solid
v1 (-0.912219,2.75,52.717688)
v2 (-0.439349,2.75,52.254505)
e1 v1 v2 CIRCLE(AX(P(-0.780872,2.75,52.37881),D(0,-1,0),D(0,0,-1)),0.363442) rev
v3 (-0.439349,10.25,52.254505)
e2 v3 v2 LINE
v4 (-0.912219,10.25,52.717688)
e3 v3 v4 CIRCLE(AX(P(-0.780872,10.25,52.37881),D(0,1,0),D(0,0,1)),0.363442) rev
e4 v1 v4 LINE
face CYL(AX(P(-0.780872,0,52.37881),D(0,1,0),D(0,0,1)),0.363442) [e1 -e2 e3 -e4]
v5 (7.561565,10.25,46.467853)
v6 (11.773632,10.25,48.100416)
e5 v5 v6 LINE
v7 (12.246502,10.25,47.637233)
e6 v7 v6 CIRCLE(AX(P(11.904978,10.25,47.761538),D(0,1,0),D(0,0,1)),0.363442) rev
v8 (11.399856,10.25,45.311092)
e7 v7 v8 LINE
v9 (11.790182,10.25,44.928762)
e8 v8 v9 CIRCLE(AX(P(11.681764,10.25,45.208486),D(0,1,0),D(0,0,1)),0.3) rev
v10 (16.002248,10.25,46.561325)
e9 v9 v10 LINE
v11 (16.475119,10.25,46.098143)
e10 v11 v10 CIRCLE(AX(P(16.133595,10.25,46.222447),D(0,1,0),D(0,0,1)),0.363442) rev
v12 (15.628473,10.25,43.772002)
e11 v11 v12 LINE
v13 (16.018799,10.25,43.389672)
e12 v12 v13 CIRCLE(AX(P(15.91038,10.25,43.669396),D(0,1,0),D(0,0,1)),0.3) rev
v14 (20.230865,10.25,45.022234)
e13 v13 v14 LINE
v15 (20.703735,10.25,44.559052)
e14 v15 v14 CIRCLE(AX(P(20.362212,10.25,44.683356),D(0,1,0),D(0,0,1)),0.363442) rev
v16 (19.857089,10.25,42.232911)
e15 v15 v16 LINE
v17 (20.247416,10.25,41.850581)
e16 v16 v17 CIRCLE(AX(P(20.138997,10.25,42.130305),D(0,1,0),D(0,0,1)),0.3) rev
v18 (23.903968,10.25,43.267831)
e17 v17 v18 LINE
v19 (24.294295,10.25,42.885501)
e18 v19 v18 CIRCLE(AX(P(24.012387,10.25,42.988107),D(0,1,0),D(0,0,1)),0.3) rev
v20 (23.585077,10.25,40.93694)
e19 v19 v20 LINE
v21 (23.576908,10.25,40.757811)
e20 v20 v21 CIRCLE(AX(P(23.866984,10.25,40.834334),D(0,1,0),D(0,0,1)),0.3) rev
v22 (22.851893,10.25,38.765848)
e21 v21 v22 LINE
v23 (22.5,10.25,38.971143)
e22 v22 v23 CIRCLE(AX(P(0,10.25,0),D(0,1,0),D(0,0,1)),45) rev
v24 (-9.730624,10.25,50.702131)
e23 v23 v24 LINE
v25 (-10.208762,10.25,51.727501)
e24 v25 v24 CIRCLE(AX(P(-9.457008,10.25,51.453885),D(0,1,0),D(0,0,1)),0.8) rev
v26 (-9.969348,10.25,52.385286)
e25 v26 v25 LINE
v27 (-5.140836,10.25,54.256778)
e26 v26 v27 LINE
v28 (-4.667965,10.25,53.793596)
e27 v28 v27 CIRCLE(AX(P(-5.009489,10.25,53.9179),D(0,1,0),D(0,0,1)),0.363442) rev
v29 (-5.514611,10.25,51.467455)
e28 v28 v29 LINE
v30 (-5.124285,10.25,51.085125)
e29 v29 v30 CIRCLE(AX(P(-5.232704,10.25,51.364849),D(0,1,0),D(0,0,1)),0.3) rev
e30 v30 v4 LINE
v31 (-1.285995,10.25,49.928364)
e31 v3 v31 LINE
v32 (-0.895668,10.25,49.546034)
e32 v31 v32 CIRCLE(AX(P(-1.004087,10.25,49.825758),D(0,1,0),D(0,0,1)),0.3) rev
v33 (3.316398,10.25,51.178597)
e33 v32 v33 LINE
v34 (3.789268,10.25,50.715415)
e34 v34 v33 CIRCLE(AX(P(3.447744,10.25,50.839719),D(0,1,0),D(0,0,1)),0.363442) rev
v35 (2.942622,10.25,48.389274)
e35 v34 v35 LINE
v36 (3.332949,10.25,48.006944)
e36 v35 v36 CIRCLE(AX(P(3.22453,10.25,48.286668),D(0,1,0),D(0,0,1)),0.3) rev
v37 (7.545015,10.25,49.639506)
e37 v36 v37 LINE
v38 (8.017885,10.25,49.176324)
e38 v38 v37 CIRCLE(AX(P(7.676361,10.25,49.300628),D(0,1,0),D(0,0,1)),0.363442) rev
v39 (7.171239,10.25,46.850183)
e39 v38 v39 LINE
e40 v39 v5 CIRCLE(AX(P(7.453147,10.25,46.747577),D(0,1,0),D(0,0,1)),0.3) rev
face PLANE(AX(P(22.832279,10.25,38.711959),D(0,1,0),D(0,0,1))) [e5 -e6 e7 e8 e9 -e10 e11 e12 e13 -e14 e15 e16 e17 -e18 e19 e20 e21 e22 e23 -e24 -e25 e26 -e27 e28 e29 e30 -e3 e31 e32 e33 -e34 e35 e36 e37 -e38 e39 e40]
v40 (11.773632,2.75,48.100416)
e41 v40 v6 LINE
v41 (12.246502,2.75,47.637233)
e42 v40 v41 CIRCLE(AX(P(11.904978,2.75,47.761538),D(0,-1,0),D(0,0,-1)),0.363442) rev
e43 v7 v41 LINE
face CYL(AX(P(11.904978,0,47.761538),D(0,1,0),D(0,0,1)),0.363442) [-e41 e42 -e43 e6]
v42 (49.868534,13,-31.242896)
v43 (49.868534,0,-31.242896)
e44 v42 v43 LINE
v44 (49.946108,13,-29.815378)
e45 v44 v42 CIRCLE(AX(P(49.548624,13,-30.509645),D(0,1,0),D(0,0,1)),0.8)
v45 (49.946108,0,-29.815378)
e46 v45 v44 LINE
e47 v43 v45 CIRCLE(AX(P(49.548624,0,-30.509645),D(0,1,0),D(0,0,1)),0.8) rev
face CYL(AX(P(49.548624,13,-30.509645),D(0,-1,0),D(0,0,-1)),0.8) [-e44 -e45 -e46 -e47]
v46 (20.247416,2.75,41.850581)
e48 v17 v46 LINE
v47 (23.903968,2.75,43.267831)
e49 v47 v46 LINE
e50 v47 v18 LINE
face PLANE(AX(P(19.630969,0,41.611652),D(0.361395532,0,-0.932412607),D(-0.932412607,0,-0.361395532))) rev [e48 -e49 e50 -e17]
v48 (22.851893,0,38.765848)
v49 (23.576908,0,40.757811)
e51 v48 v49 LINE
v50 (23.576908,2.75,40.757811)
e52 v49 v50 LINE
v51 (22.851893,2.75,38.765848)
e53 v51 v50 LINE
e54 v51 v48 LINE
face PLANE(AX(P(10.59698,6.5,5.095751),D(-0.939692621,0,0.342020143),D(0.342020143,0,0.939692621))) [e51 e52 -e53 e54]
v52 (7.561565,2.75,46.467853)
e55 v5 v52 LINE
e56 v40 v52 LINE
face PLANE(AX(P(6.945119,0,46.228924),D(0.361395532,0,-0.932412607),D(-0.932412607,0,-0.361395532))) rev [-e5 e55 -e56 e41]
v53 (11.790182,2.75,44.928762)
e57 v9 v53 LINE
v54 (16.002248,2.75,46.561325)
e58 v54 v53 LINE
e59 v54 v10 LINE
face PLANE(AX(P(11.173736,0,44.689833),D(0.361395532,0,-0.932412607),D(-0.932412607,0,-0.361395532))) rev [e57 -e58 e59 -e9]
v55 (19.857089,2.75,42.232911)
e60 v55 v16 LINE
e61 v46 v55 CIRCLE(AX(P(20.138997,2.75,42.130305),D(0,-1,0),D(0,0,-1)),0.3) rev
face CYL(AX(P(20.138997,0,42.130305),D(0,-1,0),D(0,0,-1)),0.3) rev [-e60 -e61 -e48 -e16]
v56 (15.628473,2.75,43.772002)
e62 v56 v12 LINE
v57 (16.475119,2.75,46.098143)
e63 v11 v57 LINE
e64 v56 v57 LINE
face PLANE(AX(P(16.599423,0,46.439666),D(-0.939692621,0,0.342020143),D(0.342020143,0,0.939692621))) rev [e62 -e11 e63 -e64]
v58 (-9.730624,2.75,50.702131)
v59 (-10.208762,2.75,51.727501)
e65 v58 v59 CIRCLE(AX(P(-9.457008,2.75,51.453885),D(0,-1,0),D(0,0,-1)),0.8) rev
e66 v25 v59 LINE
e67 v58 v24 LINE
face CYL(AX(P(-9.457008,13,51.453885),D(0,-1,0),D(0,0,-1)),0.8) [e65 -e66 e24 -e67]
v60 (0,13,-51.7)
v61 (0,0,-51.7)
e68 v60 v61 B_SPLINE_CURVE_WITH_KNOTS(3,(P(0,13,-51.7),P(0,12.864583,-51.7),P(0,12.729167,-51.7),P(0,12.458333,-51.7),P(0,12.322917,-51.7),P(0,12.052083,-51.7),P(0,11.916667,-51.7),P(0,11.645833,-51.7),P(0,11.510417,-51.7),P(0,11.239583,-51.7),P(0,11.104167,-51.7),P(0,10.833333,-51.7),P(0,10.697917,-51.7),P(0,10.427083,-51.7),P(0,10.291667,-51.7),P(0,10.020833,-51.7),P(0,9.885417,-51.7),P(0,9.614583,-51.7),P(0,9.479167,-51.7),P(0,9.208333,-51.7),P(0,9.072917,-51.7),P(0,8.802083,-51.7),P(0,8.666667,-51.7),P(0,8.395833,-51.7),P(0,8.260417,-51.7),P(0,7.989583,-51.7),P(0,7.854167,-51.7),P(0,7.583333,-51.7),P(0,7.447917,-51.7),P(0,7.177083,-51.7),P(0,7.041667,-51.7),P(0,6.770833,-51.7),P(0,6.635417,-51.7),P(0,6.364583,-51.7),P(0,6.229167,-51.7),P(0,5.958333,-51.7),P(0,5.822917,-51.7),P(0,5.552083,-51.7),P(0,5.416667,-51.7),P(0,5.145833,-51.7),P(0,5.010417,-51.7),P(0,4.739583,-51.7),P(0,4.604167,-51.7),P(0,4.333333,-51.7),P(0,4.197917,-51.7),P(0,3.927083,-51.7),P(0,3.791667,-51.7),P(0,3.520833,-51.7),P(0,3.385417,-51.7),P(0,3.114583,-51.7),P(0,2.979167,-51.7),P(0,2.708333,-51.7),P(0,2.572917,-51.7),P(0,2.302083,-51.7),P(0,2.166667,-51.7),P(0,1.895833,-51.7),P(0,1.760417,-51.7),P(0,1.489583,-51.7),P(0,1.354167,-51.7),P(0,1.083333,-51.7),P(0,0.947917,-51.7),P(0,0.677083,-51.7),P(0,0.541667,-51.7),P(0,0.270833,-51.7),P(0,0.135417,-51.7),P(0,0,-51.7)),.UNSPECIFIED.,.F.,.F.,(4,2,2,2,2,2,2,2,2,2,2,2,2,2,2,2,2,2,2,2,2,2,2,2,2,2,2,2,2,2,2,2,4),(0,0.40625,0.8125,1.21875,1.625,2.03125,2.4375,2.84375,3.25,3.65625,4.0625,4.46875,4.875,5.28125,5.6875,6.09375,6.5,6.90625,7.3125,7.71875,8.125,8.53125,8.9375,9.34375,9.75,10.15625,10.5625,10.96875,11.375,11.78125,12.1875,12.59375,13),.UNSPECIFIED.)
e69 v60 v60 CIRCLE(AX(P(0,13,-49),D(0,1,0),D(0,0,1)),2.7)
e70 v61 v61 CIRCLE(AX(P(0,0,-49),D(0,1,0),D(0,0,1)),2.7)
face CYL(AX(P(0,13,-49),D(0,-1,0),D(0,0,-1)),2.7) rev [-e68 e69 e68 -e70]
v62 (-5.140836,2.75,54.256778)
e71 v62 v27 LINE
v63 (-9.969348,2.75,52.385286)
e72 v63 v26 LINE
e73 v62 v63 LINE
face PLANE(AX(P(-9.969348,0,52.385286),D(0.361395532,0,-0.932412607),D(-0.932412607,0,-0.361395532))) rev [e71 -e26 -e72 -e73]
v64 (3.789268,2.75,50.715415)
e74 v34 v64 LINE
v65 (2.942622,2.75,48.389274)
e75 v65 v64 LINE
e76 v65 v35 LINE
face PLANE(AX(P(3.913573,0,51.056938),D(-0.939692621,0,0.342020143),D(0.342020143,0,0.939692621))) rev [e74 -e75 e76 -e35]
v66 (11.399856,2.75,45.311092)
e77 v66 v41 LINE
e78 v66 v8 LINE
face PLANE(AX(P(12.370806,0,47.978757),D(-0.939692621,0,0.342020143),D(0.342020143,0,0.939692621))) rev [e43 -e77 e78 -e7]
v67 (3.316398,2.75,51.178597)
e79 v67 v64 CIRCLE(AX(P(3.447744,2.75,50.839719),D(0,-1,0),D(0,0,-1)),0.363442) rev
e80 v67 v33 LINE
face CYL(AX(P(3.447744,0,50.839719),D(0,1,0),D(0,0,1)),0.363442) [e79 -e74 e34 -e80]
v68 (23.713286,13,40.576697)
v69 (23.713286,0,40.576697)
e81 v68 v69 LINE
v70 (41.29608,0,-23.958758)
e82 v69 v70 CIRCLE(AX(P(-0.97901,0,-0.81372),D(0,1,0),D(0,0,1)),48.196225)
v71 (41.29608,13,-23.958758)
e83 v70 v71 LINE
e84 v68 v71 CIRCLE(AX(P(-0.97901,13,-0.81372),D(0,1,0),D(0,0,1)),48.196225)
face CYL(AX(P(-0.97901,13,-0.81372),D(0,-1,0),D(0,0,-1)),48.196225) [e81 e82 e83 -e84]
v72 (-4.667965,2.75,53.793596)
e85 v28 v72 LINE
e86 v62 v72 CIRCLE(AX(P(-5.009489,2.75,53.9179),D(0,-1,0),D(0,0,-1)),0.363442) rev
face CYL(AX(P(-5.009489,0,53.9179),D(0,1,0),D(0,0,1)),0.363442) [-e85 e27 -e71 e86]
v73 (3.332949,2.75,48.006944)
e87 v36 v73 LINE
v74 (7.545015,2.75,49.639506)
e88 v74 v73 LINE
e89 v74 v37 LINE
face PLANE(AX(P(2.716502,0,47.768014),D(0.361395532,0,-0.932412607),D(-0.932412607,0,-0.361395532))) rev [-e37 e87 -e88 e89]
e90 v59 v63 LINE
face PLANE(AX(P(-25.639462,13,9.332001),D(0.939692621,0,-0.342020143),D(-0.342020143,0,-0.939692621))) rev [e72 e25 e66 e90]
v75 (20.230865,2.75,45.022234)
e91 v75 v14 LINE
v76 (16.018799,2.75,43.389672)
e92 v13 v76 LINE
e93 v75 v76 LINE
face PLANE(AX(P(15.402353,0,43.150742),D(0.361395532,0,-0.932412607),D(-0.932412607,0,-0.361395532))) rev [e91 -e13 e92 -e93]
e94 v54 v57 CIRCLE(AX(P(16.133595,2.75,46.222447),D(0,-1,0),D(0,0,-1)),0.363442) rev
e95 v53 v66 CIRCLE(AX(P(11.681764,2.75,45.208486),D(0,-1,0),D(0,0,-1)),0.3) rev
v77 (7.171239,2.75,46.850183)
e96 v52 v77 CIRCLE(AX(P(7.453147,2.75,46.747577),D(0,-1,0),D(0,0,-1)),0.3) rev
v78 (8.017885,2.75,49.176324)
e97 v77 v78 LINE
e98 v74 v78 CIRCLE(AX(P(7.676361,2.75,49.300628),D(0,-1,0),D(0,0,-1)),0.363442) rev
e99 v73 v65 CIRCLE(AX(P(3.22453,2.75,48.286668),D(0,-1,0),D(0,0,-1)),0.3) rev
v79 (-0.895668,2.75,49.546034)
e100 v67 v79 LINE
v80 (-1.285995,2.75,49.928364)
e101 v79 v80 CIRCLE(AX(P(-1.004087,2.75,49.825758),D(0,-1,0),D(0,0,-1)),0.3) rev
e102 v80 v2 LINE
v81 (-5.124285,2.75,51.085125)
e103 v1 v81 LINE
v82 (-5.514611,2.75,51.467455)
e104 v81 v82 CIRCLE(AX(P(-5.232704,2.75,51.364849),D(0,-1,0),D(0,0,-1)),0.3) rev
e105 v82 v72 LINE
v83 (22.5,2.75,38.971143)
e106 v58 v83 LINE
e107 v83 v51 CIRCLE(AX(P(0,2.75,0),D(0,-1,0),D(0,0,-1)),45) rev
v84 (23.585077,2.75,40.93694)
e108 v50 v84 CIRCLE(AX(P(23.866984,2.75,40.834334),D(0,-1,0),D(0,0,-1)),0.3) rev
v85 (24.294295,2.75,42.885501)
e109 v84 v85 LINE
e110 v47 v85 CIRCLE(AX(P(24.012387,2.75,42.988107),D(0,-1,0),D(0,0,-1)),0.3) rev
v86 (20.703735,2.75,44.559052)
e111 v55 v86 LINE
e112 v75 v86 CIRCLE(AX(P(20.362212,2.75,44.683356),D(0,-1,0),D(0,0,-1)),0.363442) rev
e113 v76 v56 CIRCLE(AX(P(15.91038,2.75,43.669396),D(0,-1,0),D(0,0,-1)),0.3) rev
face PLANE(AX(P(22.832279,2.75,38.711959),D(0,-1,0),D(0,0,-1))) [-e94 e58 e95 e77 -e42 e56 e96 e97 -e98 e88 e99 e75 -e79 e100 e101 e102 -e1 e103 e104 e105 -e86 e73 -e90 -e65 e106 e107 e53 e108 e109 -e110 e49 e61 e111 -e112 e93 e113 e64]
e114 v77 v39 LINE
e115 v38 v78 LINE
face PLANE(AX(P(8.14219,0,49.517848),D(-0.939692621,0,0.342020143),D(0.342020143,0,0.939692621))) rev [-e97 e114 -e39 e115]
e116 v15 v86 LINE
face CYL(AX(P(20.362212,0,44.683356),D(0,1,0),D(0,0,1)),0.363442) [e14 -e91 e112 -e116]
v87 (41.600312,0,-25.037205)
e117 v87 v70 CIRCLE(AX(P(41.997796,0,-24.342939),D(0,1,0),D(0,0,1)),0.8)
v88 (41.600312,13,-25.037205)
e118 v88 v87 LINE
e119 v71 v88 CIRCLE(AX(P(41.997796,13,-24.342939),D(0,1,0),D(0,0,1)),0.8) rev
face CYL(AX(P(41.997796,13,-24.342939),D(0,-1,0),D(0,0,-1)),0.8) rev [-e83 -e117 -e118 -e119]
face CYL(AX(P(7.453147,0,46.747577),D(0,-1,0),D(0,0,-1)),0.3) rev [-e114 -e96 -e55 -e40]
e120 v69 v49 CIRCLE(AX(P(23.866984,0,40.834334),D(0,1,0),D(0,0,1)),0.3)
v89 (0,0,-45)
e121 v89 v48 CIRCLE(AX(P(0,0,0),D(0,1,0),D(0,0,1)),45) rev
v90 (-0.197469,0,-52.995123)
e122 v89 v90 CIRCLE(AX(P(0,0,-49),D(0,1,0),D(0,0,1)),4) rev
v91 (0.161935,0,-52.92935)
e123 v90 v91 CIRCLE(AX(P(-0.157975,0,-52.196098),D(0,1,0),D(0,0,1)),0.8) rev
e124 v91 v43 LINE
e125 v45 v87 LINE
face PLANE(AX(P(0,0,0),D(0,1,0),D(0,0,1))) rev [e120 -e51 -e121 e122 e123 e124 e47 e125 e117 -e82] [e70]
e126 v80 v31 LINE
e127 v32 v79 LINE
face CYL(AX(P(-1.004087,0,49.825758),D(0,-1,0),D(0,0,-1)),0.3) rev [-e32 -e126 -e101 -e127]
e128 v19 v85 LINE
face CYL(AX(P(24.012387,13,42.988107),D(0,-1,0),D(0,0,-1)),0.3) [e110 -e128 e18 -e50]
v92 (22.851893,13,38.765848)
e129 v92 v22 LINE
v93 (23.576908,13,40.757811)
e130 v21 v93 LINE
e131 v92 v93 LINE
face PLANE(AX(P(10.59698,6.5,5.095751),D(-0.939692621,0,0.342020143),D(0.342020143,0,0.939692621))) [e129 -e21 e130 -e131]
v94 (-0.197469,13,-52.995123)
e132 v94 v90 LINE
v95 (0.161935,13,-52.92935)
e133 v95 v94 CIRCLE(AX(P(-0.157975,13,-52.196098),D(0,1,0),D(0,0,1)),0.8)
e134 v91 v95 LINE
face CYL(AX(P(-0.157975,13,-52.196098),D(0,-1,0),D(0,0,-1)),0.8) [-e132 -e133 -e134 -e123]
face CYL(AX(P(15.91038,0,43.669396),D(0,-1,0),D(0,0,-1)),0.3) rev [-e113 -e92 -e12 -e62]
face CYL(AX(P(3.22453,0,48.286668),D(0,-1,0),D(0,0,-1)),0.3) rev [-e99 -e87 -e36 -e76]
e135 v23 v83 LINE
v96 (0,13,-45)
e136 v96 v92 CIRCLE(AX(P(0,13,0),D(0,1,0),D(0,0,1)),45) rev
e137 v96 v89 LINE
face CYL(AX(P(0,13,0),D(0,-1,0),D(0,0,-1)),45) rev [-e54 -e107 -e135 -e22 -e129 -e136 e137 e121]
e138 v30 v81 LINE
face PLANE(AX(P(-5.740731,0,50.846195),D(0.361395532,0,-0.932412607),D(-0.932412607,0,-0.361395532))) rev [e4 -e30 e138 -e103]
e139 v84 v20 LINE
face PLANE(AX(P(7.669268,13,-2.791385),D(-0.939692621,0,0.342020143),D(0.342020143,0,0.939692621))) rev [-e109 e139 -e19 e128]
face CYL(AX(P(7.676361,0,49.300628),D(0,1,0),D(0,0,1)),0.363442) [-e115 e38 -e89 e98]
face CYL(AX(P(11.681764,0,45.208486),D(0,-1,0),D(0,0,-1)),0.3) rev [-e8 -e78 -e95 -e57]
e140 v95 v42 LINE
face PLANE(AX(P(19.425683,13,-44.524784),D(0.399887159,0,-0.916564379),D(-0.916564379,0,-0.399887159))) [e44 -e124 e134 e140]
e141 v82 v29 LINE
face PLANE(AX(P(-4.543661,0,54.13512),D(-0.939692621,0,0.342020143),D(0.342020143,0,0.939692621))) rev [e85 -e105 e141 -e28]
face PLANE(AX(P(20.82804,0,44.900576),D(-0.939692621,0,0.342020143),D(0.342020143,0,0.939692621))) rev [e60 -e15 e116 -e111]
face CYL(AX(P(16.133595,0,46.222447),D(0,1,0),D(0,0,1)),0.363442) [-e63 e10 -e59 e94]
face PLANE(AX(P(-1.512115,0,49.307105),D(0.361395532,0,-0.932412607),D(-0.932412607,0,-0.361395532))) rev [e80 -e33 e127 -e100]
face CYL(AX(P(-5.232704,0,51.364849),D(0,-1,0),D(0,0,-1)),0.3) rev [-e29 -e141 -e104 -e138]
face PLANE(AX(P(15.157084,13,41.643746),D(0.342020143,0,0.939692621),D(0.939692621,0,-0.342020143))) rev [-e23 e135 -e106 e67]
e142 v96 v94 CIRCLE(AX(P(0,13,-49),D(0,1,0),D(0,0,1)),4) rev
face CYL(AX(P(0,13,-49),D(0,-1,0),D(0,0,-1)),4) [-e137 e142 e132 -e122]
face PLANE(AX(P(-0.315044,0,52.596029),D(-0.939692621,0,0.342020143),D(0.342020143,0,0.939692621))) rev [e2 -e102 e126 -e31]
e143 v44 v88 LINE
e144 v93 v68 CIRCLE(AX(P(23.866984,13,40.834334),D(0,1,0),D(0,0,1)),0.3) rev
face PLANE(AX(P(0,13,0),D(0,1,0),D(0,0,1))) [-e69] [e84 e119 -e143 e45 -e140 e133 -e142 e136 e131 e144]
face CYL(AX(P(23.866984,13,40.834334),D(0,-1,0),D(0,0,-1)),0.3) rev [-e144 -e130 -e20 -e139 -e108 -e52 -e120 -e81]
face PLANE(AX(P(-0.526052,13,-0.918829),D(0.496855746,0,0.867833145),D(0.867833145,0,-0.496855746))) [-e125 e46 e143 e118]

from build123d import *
from build123d.topology import SkipClean

# Parameters (mm, degrees)
BOSS_EXTRUDE1_DEPTH = 13
CUT_EXTRUDE3_DEPTH  = 77.831899265
FILLET1_R           = 0.8
LPATTERN1_DEPTH     = 13
FILLET2_R           = 0.363442
FILLET3_R           = 0.363442
FILLET4_R           = 0.363442
FILLET5_R           = 0.363442
FILLET6_R           = 0.363442
FILLET7_R           = 0.363442
FILLET8_R           = 0.363442
FILLET9_R           = 0.3
SKETCH3_OUTSIDE_W   = 148.316
SKETCH3_OUTSIDE_H   = 39.78
SKETCH3_OUTSIDE_W_2 = 5.910380326
SKETCH3_OUTSIDE_H_2 = 7.5
CUT_EXTRUDE2_DEPTH  = 35.5


# Read off the part's stored shape, not the designer's step: LPattern1
with BuildPart() as part:
    # Sketch1 → Boss-Extrude1 (new body)
    with BuildSketch(Plane(origin=(0, 0, 0), x_dir=(1, 0, 0), z_dir=(0, 1, 0))):
        with BuildLine():
            Line((0, 51.7), (0, 53))
            ThreePointArc((0, 53), (-4, 49), (0, 45))
            ThreePointArc((0, 45), (43.466662183, 11.64685703), (22.5, -38.97114317))
            Line((22.5, -38.97114317), (-10.482378388, -50.975747159))
            Line((-10.482378388, -50.975747159), (-8.772277672, -55.674210263))
            Line((-8.772277672, -55.674210263), (24.536452539, -43.550823925))
            Line((24.536452539, -43.550823925), (23.5, -40.703193978))
            ThreePointArc((23.5, -40.703193978), (45.592051892, -11.596446998), (40.913607467, 24.644050161))
            ThreePointArc((40.913607467, 24.644050161), (24.824872502, 41.52042314), (2.696847486, 48.869563675))
            ThreePointArc((2.696847486, 48.869563675), (-1.954760609, 47.137498735), (0, 51.7))
        make_face()
        with BuildLine():
            Line((51.327605208, 30.606319113), (0, 53))
            Line((0, 53), (0, 51.7))
            ThreePointArc((0, 51.7), (1.909188309, 50.909188309), (2.7, 49))
            ThreePointArc((2.7, 49), (2.699211757, 48.934762792), (2.696847486, 48.869563675))
            ThreePointArc((2.696847486, 48.869563675), (24.824872502, 41.52042314), (40.913607467, 24.644050161))
            Line((40.913607467, 24.644050161), (51.327605208, 30.606319113))
        make_face()
    extrude(amount=BOSS_EXTRUDE1_DEPTH)

    # Sketch2 → Cut-Extrude3 (cut, through all)
    with BuildSketch(Plane(origin=(0, 13, 0), x_dir=(1, 0, 0), z_dir=(0, 1, 0))):
        Polygon((-8.772277672, -55.674210263), (-9.969348173, -52.38528609), (-5.013507189, -54.30612969), align=None)
    extrude(amount=-CUT_EXTRUDE3_DEPTH, mode=Mode.SUBTRACT)

    # Fillet1
    fillet1_edges = [part.edges().sort_by_distance(p)[0] for p in [
        (51.327605208, 6.5, -30.606319113),
        (40.913607467, 6.5, -24.644050161),
        (-10.482378388, 6.5, 50.975747159),
        (0, 6.5, -53),
    ]]
    fillet(fillet1_edges, radius=FILLET1_R)

    # LPattern1 outline → LPattern1 (cut)
    with BuildSketch(Plane(origin=(0, 0, 0), x_dir=(1, 0, 0), z_dir=(0, 1, 0))):
        Polygon((-0.784890395, -52.767039045), (-5.74073138, -50.846195445), (-4.543660878, -54.135119618), align=None)
        Polygon((19.630969381, -41.611651575), (20.828039883, -44.900575748), (24.536452539, -43.550823925), (24.520414883, -43.506760826), align=None)
        Polygon((15.402352588, -43.15074222), (16.59942309, -46.439666393), (20.358193573, -45.07158582), align=None)
        Polygon((11.173735794, -44.689832865), (12.370806296, -47.978757038), (16.129576779, -46.610676465), align=None)
        Polygon((6.945119001, -46.22892351), (8.142189502, -49.517847683), (11.900959986, -48.14976711), align=None)
        Polygon((2.716502207, -47.768014155), (3.913572709, -51.056938328), (7.672343192, -49.688857755), align=None)
        Polygon((-1.512114586, -49.3071048), (-0.315044085, -52.596028973), (3.443726399, -51.2279484), align=None)
    extrude(amount=LPATTERN1_DEPTH, mode=Mode.SUBTRACT)

    # Fillet2
    fillet2_edges = [part.edges().sort_by_distance(p)[0] for p in [
        (-4.543660878, 6.5, 54.135119618),
        (-5.013507189, 6.5, 54.30612969),
    ]]
    fillet(fillet2_edges, radius=FILLET2_R)

    # Fillet3
    fillet3_edges = [part.edges().sort_by_distance(p)[0] for p in [
        (-0.315044085, 6.5, 52.596028973),
        (-0.784890395, 6.5, 52.767039045),
    ]]
    fillet(fillet3_edges, radius=FILLET3_R)

    # Fillet4
    fillet4_edges = [part.edges().sort_by_distance(p)[0] for p in [
        (3.443726399, 6.5, 51.2279484),
        (3.913572709, 6.5, 51.056938328),
    ]]
    fillet(fillet4_edges, radius=FILLET4_R)

    # Fillet5
    fillet5_edges = [part.edges().sort_by_distance(p)[0] for p in [
        (8.142189502, 6.5, 49.517847683),
        (7.672343192, 6.5, 49.688857755),
    ]]
    fillet(fillet5_edges, radius=FILLET5_R)

    # Fillet6
    fillet6_edges = [part.edges().sort_by_distance(p)[0] for p in [
        (11.900959986, 6.5, 48.14976711),
        (12.370806296, 6.5, 47.978757038),
    ]]
    fillet(fillet6_edges, radius=FILLET6_R)

    # Fillet7
    fillet7_edges = [part.edges().sort_by_distance(p)[0] for p in [
        (16.129576779, 6.5, 46.610676465),
        (16.59942309, 6.5, 46.439666393),
    ]]
    fillet(fillet7_edges, radius=FILLET7_R)

    # Fillet8
    fillet8_edges = [part.edges().sort_by_distance(p)[0] for p in [
        (20.828039883, 6.5, 44.900575748),
        (20.358193573, 6.5, 45.07158582),
    ]]
    fillet(fillet8_edges, radius=FILLET8_R)

    # Fillet9
    fillet9_edges = [part.edges().sort_by_distance(p)[0] for p in [
        (6.945119001, 6.5, 46.22892351),
        (11.173735794, 6.5, 44.689832865),
        (-1.512114586, 6.5, 49.3071048),
        (2.716502207, 6.5, 47.768014155),
        (24.520414883, 6.5, 43.506760826),
        (19.630969381, 6.5, 41.611651575),
        (15.402352588, 6.5, 43.15074222),
        (-5.74073138, 6.5, 50.846195445),
        (23.5, 6.5, 40.703193978),
    ]]
    fillet(fillet9_edges, radius=FILLET9_R)

    # Sketch3 outside → Cut-Extrude2 (cut)
    with SkipClean():  # the faces are left unmerged after this step: merging them gives an invalid solid
        with BuildSketch(Plane(origin=(-25.639462386, 0, 9.332001131), x_dir=(0.3420201433256706, 0, 0.9396926207859078), z_dir=(-0.9396926207859078, 0, 0.3420201433256706))):
            with Locations((7.46, 6.5)):
                Rectangle(SKETCH3_OUTSIDE_W, SKETCH3_OUTSIDE_H)
            with Locations((47.141631591, 6.5)):
                Rectangle(SKETCH3_OUTSIDE_W_2, SKETCH3_OUTSIDE_H_2, mode=Mode.SUBTRACT)
        extrude(amount=-CUT_EXTRUDE2_DEPTH, mode=Mode.SUBTRACT)


solid = part.part
